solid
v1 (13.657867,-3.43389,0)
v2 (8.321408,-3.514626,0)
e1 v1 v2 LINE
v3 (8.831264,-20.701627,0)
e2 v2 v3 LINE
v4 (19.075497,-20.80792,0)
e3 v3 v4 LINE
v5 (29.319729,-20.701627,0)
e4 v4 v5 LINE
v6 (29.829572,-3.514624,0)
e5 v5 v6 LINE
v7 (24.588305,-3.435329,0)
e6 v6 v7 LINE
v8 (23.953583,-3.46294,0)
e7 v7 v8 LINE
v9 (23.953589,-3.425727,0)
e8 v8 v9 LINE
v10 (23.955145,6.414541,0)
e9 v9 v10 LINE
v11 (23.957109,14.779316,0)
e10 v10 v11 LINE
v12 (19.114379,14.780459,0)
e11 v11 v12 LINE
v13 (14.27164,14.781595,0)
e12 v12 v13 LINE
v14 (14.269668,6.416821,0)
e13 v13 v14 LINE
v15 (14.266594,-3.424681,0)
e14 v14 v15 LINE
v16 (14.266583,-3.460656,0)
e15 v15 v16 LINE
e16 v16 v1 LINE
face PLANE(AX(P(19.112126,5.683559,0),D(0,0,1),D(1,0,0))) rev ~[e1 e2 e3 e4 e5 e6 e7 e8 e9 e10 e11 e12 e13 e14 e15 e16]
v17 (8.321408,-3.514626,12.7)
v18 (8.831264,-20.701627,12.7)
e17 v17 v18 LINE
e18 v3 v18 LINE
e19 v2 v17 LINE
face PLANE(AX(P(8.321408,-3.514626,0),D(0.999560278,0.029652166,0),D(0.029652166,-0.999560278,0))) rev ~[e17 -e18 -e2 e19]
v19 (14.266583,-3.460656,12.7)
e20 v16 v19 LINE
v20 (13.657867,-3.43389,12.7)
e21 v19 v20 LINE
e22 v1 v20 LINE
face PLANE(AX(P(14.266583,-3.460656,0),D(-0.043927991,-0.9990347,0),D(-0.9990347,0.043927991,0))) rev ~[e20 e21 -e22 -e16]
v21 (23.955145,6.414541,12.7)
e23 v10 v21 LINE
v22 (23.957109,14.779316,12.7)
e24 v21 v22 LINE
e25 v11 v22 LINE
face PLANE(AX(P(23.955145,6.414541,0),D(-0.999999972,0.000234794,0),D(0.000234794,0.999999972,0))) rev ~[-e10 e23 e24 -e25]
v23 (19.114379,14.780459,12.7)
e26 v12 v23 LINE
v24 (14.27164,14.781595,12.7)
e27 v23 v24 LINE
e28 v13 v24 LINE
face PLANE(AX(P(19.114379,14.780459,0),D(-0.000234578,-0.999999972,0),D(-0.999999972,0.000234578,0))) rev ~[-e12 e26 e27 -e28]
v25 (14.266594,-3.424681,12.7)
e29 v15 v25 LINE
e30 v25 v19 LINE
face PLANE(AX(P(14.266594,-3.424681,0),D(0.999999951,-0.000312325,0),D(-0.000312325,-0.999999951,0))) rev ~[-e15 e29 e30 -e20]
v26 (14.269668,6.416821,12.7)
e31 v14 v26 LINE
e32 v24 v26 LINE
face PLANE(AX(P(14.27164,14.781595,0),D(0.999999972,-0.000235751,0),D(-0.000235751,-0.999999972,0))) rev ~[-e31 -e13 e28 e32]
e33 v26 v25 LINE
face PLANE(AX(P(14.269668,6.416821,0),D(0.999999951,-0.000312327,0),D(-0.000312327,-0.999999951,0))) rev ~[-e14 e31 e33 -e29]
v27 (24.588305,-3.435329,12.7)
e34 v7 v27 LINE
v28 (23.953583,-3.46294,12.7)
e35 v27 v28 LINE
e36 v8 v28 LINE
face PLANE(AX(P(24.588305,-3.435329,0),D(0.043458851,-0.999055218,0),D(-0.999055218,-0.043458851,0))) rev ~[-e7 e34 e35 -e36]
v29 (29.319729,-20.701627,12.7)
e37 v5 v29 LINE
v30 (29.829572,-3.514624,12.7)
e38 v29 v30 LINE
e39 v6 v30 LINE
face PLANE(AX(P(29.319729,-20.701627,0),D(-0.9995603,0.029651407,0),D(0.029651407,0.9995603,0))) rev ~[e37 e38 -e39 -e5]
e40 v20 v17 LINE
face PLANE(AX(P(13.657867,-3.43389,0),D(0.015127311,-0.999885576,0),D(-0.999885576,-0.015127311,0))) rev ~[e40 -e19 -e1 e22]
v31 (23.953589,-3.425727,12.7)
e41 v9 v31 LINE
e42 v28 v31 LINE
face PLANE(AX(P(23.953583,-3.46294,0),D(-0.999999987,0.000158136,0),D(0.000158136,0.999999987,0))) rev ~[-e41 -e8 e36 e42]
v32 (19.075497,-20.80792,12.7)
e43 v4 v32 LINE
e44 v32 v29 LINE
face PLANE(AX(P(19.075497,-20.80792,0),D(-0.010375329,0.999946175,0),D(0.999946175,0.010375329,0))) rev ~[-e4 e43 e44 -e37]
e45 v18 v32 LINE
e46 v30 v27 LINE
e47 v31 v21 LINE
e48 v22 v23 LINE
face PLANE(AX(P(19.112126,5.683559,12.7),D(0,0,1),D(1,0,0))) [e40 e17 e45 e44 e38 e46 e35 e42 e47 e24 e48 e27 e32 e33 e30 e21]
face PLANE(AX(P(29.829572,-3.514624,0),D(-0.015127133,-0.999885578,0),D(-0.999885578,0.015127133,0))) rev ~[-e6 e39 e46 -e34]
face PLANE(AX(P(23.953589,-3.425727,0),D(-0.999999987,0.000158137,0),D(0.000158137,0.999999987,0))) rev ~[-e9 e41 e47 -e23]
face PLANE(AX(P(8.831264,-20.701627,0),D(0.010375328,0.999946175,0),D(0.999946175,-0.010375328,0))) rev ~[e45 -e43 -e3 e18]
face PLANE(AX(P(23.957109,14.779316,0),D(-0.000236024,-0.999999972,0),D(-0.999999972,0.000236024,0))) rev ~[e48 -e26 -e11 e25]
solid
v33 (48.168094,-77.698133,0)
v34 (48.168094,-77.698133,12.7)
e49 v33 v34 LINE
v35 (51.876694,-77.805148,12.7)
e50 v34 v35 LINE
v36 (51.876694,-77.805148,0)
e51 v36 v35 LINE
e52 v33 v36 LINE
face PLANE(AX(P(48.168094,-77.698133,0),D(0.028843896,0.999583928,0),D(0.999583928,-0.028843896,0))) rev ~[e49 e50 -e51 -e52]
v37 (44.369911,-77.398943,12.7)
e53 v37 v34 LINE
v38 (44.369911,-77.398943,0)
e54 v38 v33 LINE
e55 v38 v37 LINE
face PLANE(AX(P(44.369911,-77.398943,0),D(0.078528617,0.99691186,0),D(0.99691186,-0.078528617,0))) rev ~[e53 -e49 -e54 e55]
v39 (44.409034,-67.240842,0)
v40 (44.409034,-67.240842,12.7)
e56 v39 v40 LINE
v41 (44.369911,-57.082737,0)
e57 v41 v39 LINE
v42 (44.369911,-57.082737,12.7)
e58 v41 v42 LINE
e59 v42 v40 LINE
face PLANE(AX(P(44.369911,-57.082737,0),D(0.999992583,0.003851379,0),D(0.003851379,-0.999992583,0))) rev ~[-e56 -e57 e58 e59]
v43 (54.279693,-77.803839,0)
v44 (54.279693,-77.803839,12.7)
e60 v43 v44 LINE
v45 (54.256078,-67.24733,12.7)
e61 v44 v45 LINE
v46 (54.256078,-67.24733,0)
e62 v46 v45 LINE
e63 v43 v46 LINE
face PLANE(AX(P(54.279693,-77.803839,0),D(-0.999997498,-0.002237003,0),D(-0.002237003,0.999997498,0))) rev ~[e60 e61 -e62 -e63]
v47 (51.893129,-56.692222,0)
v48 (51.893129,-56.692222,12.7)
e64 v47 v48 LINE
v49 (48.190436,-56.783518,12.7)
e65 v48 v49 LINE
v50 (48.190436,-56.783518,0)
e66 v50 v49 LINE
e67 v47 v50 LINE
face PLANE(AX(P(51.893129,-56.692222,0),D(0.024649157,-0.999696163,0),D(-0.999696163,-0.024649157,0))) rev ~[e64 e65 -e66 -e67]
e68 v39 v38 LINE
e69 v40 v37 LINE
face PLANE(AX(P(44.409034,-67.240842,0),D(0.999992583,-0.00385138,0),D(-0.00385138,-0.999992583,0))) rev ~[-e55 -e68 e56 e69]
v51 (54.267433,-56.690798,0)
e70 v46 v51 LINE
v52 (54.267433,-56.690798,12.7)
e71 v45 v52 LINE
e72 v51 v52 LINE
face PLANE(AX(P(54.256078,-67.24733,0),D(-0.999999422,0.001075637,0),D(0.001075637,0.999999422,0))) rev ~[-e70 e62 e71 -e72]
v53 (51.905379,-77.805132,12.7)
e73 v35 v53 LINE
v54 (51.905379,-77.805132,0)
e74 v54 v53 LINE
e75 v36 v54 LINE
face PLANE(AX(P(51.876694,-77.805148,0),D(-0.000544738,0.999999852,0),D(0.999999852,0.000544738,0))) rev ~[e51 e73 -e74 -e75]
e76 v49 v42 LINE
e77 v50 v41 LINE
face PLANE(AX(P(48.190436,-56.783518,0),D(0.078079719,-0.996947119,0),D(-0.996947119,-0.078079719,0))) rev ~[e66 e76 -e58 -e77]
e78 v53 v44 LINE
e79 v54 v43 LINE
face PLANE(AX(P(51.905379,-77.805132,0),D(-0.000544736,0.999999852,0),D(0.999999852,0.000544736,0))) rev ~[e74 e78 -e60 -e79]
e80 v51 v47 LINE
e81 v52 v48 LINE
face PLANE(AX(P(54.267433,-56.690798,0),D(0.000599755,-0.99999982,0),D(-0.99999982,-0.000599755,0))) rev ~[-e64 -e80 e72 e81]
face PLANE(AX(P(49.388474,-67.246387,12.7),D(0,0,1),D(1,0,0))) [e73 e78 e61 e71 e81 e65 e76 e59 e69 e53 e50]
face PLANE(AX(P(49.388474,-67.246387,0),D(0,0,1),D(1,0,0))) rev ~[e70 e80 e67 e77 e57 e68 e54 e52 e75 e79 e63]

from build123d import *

# Parameters (mm, degrees)
F1_DEPTH = 12.7
F2_DEPTH = 12.7
F3_DEPTH = 12.7


# Not quite as in the source:
# - ends of sketch curves that miss each other by under 0.0002 mm in the source are joined


with BuildPart() as f1:
    # F0 (on Top) → F1 (new body)
    with BuildSketch(Plane.XY):
        Polygon((48.1904364, -56.783518093), (44.3699114476, -57.0827370893), (44.4090344471, -67.2408419628), (44.3699114476, -77.3989428363), (48.1680944003, -77.6981328326), (51.8766943541, -77.8051478313), (51.9053793534, -77.8051322055), (54.2796933242, -77.8038388313), (54.2560783245, -67.2473299627), (54.2674333243, -56.6907980942), (51.8931293539, -56.6922220942), align=None)
    extrude(amount=F1_DEPTH)


with BuildPart() as f2:
    # F0 (on Top) → F2 (new body)
    with BuildSketch(Plane.XY):
        Polygon((19.0754927625, -3.3519267583), (14.2665940583, -3.4246807871), (14.2665828224, -3.4606557569), (13.6578667858, -3.4338902474), (8.3214078964, -3.5146257562), (8.83126389, -20.7016265423), (19.0754967625, -20.8079195409), (29.319728635, -20.7016265423), (29.8295716286, -3.5146237562), (24.5883054068, -3.4353293517), (23.9535827018, -3.4629397569), (23.9535885865, -3.4257268072), align=None)
    extrude(amount=F2_DEPTH)

    # F0 (on Top) → F3 (join)
    with BuildSketch(Plane.XY):
        Polygon((14.2716398223, 14.781595016), (14.2696678223, 6.4168211201), (14.2665940583, -3.4246807871), (19.0754927625, -3.3519267583), (23.9535885865, -3.4257268072), (23.9551447017, 6.4145411201), (23.9571087017, 14.779316016), (19.114378762, 14.780459016), align=None)
    extrude(amount=F3_DEPTH)


solid = Compound([f1.part, f2.part])
